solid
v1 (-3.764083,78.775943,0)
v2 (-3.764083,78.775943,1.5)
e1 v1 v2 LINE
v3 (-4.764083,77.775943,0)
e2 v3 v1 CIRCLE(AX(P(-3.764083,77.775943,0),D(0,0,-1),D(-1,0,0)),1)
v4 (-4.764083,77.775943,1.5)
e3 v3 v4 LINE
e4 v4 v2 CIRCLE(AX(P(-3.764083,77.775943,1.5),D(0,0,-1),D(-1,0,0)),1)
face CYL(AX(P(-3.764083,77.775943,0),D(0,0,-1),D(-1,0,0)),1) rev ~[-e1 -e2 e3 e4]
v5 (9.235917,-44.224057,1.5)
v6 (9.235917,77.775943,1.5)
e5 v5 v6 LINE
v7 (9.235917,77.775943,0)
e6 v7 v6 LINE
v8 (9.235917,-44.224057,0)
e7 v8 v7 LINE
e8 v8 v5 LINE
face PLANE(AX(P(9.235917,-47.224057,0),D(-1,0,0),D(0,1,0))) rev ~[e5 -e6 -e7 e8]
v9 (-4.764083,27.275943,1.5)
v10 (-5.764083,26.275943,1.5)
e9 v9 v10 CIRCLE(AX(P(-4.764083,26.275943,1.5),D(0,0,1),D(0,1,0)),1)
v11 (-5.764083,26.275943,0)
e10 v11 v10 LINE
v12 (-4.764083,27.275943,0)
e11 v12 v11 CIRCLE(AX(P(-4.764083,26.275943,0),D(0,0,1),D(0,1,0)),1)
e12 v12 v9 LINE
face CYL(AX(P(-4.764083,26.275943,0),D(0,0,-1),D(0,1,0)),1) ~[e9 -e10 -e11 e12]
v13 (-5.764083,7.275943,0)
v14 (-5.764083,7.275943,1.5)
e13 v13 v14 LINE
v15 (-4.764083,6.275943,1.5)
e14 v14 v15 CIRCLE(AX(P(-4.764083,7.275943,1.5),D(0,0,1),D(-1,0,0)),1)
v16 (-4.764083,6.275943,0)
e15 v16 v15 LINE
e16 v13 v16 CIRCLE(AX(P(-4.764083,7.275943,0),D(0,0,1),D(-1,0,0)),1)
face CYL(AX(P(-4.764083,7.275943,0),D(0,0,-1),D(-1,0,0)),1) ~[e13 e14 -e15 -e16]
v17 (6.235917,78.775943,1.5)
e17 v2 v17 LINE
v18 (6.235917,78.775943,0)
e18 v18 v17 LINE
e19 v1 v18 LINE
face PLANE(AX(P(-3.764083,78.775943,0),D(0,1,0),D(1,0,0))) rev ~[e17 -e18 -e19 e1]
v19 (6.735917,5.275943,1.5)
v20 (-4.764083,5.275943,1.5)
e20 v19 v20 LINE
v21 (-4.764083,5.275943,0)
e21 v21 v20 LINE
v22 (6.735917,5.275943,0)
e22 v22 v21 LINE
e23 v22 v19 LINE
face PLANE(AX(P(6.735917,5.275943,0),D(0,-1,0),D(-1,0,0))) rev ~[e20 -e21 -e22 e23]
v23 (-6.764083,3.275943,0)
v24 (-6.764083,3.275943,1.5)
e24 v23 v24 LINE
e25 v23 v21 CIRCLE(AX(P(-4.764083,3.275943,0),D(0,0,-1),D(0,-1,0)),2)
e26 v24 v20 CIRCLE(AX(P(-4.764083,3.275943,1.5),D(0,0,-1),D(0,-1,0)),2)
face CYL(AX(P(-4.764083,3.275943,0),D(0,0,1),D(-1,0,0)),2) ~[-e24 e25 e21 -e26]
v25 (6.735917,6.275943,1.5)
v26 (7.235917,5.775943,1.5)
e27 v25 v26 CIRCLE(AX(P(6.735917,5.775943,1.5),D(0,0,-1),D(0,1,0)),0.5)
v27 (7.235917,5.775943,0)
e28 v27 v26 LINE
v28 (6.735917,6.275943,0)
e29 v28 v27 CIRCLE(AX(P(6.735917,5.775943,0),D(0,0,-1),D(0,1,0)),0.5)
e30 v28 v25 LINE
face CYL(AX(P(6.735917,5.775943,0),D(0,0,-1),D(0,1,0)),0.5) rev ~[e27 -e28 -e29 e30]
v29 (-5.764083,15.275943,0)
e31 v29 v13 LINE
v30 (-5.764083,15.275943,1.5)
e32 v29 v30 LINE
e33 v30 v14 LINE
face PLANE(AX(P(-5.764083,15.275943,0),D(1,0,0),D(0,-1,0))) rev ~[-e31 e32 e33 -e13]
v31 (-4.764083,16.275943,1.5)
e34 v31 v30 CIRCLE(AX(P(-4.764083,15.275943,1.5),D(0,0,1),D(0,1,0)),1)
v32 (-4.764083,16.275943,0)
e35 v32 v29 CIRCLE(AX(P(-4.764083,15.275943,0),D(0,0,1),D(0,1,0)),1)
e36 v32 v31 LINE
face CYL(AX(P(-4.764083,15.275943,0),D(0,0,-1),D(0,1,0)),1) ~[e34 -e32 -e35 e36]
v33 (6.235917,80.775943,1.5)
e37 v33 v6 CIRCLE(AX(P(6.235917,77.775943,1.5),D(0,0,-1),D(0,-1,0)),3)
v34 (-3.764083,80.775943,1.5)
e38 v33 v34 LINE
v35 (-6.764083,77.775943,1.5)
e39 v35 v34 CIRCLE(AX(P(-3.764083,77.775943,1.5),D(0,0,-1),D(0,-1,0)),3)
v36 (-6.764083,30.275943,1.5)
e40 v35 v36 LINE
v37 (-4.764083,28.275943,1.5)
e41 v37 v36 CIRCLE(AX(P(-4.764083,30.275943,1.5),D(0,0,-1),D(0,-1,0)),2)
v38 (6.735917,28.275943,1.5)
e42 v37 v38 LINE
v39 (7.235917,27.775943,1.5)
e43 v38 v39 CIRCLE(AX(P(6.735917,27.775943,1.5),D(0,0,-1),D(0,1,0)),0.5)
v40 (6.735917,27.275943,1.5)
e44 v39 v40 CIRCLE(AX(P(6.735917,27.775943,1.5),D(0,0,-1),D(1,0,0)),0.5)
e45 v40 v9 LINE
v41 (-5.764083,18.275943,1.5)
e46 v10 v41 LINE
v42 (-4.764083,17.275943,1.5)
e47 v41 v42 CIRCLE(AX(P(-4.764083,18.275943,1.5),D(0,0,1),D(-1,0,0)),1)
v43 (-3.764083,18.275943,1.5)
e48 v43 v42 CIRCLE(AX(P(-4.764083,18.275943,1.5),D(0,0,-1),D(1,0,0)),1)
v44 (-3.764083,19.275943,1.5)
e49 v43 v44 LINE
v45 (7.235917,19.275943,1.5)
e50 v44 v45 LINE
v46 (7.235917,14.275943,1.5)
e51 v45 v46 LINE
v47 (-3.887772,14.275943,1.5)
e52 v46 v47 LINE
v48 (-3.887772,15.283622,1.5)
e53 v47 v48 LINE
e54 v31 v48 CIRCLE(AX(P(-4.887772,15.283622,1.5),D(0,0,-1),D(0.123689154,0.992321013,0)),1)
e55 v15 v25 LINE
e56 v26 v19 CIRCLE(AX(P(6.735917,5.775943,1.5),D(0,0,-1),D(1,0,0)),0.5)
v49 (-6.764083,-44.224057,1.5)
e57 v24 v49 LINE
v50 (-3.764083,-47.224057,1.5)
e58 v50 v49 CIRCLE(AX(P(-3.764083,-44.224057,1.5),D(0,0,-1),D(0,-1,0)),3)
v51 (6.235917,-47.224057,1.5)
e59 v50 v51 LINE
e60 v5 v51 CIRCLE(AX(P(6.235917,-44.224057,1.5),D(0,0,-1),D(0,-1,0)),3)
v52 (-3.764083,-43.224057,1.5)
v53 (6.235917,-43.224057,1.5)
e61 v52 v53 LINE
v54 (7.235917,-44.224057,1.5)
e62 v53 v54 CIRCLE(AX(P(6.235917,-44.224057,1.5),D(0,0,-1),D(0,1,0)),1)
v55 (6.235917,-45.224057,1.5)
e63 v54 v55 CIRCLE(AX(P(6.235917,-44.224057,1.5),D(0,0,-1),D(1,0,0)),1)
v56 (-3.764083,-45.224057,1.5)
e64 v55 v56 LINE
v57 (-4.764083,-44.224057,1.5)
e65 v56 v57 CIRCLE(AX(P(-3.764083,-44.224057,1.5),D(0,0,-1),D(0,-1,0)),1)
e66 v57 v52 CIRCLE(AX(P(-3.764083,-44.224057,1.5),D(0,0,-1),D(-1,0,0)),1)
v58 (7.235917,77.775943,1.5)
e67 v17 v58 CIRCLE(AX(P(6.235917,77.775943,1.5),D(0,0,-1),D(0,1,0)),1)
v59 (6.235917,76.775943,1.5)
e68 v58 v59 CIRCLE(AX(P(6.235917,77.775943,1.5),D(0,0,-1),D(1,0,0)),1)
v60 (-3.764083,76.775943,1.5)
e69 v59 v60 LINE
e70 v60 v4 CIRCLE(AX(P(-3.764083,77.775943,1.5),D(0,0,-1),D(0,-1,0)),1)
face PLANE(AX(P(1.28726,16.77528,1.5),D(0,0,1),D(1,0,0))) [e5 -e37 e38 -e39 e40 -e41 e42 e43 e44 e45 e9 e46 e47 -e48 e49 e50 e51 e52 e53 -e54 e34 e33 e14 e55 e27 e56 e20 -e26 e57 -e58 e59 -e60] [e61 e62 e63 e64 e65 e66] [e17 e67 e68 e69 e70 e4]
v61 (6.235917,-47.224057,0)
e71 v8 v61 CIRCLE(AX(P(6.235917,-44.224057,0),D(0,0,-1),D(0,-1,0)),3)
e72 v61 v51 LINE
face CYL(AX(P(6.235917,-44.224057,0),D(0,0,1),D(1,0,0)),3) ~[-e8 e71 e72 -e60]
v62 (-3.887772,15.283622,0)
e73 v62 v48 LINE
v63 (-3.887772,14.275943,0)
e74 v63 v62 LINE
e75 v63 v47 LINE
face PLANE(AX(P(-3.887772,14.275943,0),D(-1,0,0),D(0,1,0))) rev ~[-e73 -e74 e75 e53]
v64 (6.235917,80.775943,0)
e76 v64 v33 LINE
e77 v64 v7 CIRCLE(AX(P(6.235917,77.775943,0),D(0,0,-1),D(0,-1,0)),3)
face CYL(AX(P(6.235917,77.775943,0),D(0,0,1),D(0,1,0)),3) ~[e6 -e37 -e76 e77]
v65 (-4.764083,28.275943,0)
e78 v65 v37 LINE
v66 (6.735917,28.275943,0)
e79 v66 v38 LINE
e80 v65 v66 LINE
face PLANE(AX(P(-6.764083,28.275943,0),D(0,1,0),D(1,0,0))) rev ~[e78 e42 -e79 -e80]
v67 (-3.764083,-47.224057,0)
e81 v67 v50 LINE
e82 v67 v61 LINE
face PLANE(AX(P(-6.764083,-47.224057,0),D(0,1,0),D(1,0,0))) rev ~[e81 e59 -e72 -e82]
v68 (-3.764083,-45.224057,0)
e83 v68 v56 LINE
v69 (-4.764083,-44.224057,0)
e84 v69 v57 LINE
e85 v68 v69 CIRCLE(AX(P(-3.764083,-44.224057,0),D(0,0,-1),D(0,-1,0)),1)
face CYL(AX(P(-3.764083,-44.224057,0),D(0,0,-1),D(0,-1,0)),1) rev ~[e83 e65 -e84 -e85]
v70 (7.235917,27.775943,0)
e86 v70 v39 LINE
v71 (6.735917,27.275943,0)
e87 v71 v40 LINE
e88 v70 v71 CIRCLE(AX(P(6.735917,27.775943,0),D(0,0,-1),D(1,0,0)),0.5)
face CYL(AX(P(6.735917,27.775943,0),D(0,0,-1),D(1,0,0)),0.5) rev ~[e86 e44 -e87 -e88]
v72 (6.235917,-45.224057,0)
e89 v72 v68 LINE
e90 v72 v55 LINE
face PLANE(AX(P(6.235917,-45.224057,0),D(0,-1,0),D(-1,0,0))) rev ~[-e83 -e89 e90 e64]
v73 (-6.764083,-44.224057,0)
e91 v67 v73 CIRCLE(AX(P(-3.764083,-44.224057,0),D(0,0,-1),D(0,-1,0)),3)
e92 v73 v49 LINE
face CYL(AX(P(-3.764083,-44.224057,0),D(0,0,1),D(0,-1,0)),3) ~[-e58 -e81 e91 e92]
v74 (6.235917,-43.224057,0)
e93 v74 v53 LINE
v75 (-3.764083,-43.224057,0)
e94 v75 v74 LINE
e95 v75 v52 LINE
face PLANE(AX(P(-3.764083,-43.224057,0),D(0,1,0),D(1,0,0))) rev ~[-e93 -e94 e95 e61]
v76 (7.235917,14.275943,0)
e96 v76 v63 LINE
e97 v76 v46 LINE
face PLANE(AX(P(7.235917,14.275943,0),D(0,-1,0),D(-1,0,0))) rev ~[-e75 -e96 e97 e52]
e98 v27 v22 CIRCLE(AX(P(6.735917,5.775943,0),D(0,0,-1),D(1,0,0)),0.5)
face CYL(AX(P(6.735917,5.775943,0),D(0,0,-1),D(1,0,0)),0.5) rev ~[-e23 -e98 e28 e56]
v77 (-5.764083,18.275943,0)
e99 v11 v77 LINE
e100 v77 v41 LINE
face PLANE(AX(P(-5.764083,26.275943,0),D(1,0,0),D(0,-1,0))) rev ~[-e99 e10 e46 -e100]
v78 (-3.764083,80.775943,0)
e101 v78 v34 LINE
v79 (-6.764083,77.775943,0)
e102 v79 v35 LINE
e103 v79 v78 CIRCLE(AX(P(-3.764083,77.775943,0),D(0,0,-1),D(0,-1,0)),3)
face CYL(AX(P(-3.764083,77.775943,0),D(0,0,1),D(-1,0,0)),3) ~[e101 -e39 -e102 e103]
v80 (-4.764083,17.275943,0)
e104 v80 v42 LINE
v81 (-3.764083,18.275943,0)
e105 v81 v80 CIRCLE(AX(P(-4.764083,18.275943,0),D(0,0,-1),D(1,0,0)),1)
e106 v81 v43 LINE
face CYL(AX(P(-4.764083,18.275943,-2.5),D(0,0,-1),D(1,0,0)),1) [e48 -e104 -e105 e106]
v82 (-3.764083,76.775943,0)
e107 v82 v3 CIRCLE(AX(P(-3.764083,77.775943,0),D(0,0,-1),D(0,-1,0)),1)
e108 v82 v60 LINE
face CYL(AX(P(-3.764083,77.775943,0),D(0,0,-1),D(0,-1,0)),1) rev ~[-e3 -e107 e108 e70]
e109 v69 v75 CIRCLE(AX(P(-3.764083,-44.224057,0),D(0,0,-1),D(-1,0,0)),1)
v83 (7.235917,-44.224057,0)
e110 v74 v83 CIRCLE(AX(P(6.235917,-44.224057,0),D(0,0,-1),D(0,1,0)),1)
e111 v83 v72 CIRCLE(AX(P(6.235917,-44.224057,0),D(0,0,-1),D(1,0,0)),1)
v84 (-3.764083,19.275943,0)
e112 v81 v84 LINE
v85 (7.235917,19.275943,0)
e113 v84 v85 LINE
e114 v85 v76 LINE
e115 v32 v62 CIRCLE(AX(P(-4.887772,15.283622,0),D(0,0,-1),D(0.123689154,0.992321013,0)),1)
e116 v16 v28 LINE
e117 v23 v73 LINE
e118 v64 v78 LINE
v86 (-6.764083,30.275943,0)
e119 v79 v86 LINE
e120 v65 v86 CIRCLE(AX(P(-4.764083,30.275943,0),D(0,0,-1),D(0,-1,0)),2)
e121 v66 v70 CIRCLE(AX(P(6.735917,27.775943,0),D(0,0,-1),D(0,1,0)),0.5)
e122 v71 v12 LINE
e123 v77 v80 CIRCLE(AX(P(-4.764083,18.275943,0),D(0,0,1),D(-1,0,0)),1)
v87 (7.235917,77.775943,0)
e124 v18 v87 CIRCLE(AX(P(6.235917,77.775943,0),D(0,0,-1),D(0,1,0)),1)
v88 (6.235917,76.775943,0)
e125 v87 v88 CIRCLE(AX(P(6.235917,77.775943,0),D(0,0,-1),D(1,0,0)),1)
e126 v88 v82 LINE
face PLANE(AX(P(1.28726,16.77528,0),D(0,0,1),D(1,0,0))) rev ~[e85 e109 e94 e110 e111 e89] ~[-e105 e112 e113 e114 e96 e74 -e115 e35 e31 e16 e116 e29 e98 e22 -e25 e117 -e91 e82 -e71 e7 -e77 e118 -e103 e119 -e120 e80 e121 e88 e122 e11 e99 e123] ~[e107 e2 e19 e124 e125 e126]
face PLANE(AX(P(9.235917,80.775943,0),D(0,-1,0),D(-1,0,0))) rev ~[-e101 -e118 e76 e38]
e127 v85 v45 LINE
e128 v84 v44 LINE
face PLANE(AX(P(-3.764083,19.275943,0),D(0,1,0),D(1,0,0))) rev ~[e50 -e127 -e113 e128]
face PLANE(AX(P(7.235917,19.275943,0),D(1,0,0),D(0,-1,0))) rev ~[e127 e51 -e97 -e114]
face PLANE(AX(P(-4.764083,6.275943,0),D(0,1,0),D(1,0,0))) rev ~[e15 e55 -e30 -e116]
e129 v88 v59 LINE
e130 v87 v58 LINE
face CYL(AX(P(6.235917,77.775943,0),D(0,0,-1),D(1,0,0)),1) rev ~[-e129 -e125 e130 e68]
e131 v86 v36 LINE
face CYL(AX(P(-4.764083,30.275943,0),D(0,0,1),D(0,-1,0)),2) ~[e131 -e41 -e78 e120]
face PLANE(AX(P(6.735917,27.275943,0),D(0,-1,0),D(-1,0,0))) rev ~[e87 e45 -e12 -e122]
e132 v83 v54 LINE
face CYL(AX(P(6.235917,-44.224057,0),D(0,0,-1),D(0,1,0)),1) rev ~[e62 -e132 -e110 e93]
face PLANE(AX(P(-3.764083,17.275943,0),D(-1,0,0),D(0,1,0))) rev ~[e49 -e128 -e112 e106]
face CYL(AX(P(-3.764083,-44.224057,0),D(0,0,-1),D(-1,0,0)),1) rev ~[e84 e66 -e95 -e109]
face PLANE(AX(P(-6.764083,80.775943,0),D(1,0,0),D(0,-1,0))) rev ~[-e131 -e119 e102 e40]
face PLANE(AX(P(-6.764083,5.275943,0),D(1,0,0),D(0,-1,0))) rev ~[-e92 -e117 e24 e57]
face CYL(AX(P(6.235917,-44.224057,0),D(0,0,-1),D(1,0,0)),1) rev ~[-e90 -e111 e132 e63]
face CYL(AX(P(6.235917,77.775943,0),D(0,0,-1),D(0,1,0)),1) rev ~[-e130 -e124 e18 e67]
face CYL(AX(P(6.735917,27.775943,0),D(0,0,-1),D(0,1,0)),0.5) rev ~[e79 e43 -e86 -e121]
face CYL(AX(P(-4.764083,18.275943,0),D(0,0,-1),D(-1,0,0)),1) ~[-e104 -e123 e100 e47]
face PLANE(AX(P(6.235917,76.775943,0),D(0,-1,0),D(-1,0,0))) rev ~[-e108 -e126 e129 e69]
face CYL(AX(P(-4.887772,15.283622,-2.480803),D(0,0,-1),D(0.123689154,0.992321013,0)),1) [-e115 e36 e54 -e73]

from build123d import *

# Parameters (mm, degrees)
F1_DEPTH    = 1.5
F2_T1_DEPTH = 6.5
F2_T3_DEPTH = 6.4616050658
F3_R        = 2
F4_R        = 3


# Not quite as in the source:
# - a fillet or chamfer that OpenCascade refuses, or shapes differently, is made with other operations: its cross-section is extruded or revolved along the edge and cut away or added


with BuildPart() as f1:
    # F0 (on Top) → F1 (new body)
    with BuildSketch(Plane.XY):
        with BuildLine():
            Line((6.7359172925, 27.2759429877), (-4.7640827075, 27.2759429877))
            ThreePointArc((-4.7640827075, 27.2759429877), (-5.4711894887, 26.9830497689), (-5.7640827075, 26.2759429877))
            Line((-5.7640827075, 26.2759429877), (-5.7640827075, 18.2759429877))
            ThreePointArc((-5.7640827075, 18.2759429877), (-5.4711894887, 17.5688362065), (-4.7640827075, 17.2759429877))
            Line((-4.7640827075, 17.2759429877), (-3.7640827075, 17.2759429877))
            Line((-3.7640827075, 17.2759429877), (-3.7640827075, 19.2759429877))
            Line((-3.7640827075, 19.2759429877), (7.2359172925, 19.2759429877))
            Line((7.2359172925, 19.2759429877), (7.2359172925, 17.2759429877))
            Line((7.2359172925, 17.2759429877), (7.2359172925, 16.2759429877))
            Line((7.2359172925, 16.2759429877), (7.2359172925, 14.2759429877))
            Line((7.2359172925, 14.2759429877), (-3.8877718616, 14.2759429877))
            Line((-3.8877718616, 14.2759429877), (-3.8877718616, 16.2759429877))
            Line((-3.8877718616, 16.2759429877), (-4.7640827075, 16.2759429877))
            ThreePointArc((-4.7640827075, 16.2759429877), (-5.4711894887, 15.9830497689), (-5.7640827075, 15.2759429877))
            Line((-5.7640827075, 15.2759429877), (-5.7640827075, 7.2759429877))
            ThreePointArc((-5.7640827075, 7.2759429877), (-5.4711894887, 6.5688362065), (-4.7640827075, 6.2759429877))
            Line((-4.7640827075, 6.2759429877), (6.7359172925, 6.2759429877))
            ThreePointArc((6.7359172925, 6.2759429877), (7.0894706831, 6.1294963783), (7.2359172925, 5.7759429877))
            ThreePointArc((7.2359172925, 5.7759429877), (7.0894706831, 5.4223895971), (6.7359172925, 5.2759429877))
            Line((6.7359172925, 5.2759429877), (-5.7640827075, 5.2759429877))
            Line((-5.7640827075, 5.2759429877), (-6.7640827075, 5.2759429877))
            Line((-6.7640827075, 5.2759429877), (-6.7640827075, -47.2240570123))
            Line((-6.7640827075, -47.2240570123), (9.2359172925, -47.2240570123))
            Line((9.2359172925, -47.2240570123), (9.2359172925, 80.7759429877))
            Line((9.2359172925, 80.7759429877), (-6.7640827075, 80.7759429877))
            Line((-6.7640827075, 80.7759429877), (-6.7640827075, 28.2759429877))
            Line((-6.7640827075, 28.2759429877), (-5.7640827075, 28.2759429877))
            Line((-5.7640827075, 28.2759429877), (6.7359172925, 28.2759429877))
            ThreePointArc((6.7359172925, 28.2759429877), (7.0894706831, 28.1294963783), (7.2359172925, 27.7759429877))
            ThreePointArc((7.2359172925, 27.7759429877), (7.0894706831, 27.4223895971), (6.7359172925, 27.2759429877))
        make_face()
        with BuildLine():
            ThreePointArc((-4.7640827075, -44.2240570123), (-4.4711894887, -43.5169502311), (-3.7640827075, -43.2240570123))
            Line((-3.7640827075, -43.2240570123), (6.2359172925, -43.2240570123))
            ThreePointArc((6.2359172925, -43.2240570123), (6.9430240737, -43.5169502311), (7.2359172925, -44.2240570123))
            ThreePointArc((7.2359172925, -44.2240570123), (6.9430240737, -44.9311637935), (6.2359172925, -45.2240570123))
            Line((6.2359172925, -45.2240570123), (-3.7640827075, -45.2240570123))
            ThreePointArc((-3.7640827075, -45.2240570123), (-4.4711894887, -44.9311637935), (-4.7640827075, -44.2240570123))
        make_face(mode=Mode.SUBTRACT)
        with BuildLine():
            Line((6.2359172925, 76.7759429877), (-3.7640827075, 76.7759429877))
            ThreePointArc((-3.7640827075, 76.7759429877), (-4.4711894887, 77.0688362065), (-4.7640827075, 77.7759429877))
            ThreePointArc((-4.7640827075, 77.7759429877), (-4.4711894887, 78.4830497689), (-3.7640827075, 78.7759429877))
            Line((-3.7640827075, 78.7759429877), (6.2359172925, 78.7759429877))
            ThreePointArc((6.2359172925, 78.7759429877), (6.9430240737, 78.4830497689), (7.2359172925, 77.7759429877))
            ThreePointArc((7.2359172925, 77.7759429877), (6.9430240737, 77.0688362065), (6.2359172925, 76.7759429877))
        make_face(mode=Mode.SUBTRACT)
    extrude(amount=F1_DEPTH)

    # F2: fillet of radius 1 on 2 edges, made by hand

    # F2_s2 → F2_t1 (cut)
    with BuildSketch(Plane.XY.offset(-2.5)):
        with BuildLine():
            ThreePointArc((-3.7640827075, 18.2759429877), (-4.0569759263, 17.5688362065), (-4.7640827075, 17.2759429877))
            Line((-4.7640827075, 17.2759429877), (-3.7640827075, 17.2759429877))
            Line((-3.7640827075, 17.2759429877), (-3.7640827075, 18.2759429877))
        make_face()
    extrude(amount=F2_T1_DEPTH, mode=Mode.SUBTRACT)

    # F2_s4 → F2_t3 (cut)
    with BuildSketch(Plane.XY.offset(-2.4808025329)):
        with BuildLine():
            ThreePointArc((-4.7640827075, 16.2759429877), (-4.1382089376, 15.94555507), (-3.8877718616, 15.2836219745))
            Line((-3.8877718616, 15.2836219745), (-3.8877718616, 16.2759429877))
            Line((-3.8877718616, 16.2759429877), (-4.7640827075, 16.2759429877))
        make_face()
    extrude(amount=F2_T3_DEPTH, mode=Mode.SUBTRACT)

    # F3
    f3_edges = [f1.edges().sort_by_distance(p)[0] for p in [
        (-6.764083, 28.275943, 0.75),
        (-6.764083, 5.275943, 0.75),
    ]]
    fillet(f3_edges, radius=F3_R)

    # F4
    f4_edges = [f1.edges().sort_by_distance(p)[0] for p in [
        (9.235917, 80.775943, 0.75),
        (-6.764083, 80.775943, 0.75),
        (-6.764083, -47.224057, 0.75),
        (9.235917, -47.224057, 0.75),
    ]]
    fillet(f4_edges, radius=F4_R)


solid = f1.part
